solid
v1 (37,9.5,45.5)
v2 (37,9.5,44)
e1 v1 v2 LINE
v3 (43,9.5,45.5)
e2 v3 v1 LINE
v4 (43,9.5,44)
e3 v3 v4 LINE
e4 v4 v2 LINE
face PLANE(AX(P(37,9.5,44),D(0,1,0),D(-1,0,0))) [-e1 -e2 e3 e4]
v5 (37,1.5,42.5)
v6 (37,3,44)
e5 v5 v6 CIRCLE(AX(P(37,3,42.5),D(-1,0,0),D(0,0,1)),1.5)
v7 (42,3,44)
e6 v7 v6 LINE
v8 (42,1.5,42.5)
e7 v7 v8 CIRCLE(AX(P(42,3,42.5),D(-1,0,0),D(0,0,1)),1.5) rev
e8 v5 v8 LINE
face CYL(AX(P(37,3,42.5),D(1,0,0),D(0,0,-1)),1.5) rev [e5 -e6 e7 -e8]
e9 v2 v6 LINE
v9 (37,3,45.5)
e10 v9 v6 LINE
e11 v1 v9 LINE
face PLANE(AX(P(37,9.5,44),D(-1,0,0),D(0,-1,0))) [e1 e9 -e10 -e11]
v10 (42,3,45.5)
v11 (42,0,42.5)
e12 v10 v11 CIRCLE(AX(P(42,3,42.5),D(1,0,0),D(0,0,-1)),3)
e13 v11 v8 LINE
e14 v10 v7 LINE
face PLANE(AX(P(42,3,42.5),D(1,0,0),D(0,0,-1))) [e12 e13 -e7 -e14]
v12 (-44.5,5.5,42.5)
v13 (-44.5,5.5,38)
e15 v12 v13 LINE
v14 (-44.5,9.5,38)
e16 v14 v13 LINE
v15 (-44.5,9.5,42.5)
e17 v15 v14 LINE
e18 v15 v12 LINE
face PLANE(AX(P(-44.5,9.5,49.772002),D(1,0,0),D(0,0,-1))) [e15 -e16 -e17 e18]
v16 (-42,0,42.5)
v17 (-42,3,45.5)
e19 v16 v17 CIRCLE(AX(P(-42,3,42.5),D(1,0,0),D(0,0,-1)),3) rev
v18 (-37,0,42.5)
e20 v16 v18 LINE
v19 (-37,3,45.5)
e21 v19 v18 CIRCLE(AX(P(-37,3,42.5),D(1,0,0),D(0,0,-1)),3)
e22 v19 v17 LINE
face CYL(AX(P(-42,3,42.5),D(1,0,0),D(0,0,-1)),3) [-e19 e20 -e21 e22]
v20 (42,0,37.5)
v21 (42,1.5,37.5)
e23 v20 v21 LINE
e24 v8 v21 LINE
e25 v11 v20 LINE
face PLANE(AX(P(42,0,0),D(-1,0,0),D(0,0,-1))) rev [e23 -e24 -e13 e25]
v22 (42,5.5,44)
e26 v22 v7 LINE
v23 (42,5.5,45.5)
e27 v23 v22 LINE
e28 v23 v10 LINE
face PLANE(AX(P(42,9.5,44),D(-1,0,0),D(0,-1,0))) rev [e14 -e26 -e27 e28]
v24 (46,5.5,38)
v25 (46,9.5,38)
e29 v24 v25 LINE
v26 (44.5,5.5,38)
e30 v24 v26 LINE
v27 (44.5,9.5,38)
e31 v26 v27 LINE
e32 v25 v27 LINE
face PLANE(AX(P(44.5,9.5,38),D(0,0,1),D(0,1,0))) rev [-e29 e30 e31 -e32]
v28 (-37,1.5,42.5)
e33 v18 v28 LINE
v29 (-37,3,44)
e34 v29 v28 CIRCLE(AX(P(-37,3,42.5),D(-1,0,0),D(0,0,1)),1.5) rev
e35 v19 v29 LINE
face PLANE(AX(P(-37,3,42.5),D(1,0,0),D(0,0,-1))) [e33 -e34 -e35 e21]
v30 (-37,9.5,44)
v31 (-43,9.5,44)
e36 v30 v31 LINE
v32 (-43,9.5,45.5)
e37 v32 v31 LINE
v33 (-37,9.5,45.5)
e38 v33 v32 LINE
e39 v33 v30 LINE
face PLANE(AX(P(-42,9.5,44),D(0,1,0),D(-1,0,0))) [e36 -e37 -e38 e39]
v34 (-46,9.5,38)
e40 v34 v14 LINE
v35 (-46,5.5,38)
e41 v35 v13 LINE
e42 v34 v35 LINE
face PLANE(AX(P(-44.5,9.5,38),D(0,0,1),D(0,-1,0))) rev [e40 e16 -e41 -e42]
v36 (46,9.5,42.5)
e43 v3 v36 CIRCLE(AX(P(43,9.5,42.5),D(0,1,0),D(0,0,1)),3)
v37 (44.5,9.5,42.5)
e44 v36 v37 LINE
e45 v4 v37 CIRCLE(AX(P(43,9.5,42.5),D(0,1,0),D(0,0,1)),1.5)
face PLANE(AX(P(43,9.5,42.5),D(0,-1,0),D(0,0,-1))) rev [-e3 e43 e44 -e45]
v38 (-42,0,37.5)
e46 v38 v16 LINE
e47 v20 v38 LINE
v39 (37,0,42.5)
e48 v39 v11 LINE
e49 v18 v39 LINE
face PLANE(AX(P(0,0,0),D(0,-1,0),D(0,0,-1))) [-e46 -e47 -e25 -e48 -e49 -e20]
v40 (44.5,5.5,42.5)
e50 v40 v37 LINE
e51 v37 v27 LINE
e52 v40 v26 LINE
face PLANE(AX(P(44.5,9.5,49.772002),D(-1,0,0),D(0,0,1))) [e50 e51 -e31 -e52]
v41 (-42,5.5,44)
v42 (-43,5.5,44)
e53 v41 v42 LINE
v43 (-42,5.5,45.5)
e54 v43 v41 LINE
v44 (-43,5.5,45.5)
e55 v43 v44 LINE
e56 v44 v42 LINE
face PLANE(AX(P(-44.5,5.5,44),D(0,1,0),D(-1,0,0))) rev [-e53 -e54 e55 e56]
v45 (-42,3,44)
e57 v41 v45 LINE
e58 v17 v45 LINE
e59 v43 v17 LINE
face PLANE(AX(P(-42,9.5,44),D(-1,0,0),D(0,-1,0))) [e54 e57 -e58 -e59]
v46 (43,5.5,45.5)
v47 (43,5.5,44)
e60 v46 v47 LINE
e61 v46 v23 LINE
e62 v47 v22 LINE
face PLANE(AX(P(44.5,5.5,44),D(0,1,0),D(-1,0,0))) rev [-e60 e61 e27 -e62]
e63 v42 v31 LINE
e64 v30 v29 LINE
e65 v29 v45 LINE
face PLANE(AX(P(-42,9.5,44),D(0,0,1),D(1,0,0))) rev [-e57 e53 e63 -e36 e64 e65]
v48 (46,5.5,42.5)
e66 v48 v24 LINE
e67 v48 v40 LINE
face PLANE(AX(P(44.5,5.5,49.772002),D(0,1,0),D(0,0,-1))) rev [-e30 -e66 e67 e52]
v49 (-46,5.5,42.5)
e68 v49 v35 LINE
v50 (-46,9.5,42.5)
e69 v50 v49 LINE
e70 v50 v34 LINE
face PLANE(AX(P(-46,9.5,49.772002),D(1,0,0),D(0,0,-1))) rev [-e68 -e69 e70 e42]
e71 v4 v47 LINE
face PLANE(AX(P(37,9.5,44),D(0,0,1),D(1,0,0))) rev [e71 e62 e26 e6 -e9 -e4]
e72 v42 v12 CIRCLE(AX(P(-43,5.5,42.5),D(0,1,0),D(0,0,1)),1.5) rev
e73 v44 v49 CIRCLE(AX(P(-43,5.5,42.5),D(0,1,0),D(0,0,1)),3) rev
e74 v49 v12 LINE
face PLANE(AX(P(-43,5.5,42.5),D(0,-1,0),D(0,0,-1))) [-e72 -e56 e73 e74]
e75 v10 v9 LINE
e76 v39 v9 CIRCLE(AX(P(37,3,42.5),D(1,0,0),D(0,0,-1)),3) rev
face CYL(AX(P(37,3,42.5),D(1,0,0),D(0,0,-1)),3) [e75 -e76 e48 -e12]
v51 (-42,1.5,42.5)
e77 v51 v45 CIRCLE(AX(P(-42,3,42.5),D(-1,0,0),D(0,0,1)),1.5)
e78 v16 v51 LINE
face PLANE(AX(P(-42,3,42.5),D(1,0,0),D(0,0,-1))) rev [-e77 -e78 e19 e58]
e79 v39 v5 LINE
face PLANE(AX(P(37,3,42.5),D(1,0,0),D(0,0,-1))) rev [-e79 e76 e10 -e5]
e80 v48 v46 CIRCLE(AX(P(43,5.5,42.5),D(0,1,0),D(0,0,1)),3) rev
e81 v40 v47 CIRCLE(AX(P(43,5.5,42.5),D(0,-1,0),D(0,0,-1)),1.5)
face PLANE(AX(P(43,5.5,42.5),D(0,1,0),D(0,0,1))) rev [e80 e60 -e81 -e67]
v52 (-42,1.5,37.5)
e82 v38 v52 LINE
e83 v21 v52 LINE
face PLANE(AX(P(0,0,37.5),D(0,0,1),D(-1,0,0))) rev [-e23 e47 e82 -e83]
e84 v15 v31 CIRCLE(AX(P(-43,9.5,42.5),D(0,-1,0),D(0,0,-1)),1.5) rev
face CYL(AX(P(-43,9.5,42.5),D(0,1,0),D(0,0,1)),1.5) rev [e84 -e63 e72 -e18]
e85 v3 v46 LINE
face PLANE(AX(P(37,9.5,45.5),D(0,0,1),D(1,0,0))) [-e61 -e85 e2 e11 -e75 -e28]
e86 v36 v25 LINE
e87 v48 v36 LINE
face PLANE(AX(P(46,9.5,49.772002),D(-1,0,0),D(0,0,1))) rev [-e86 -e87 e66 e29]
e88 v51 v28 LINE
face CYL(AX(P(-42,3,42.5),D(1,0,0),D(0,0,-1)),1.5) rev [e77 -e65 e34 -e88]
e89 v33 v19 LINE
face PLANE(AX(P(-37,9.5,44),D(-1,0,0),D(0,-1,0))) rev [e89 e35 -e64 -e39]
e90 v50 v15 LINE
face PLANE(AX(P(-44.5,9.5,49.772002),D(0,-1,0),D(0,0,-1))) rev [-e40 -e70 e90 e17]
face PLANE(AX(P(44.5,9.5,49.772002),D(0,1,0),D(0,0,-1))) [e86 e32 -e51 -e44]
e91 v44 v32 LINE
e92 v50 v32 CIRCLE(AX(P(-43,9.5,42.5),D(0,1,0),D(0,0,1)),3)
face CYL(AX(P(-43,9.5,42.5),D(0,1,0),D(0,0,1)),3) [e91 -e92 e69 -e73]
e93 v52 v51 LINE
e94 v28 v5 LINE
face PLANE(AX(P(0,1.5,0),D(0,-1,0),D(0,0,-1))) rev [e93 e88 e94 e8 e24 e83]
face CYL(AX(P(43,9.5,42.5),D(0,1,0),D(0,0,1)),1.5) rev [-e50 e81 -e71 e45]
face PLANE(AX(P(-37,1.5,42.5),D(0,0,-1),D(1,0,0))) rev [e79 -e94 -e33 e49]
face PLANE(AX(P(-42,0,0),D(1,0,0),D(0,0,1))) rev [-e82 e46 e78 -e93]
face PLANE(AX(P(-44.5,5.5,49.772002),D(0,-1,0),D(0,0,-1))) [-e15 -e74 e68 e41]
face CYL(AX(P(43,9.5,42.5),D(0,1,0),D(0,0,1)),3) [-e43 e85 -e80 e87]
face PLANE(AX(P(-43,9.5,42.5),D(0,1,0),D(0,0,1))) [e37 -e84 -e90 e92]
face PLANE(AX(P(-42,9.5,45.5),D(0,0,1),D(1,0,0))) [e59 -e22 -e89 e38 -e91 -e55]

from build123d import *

# Parameters (mm, degrees)
BOSS_EXTRUDE1_DEPTH        = 1.5
SKETCH3_W                  = 5
SKETCH3_H                  = 1.5
BOSS_EXTRUDE2_DEPTH        = 8
BOSS_EXTRUDE3_DEPTH        = 6
BOSS_EXTRUDE3_DEPTH_BACK   = 1.5
SKETCH4_W                  = 1.5
SKETCH4_H                  = 4
BOSS_EXTRUDE3_2_DEPTH      = 6
BOSS_EXTRUDE3_2_DEPTH_BACK = 1.5
SKETCH5_W                  = 2.5
SKETCH5_H                  = 1.5
BOSS_EXTRUDE4_DEPTH        = 4
CONVERT_SOLID2_START       = 5.5
CONVERT_SOLID2_DEPTH       = 4
CONVERT_SOLID2_START_2     = -42
CONVERT_SOLID2_2_DEPTH     = 5
CONVERT_SOLID2_START_3     = 37
CONVERT_SOLID2_3_DEPTH     = 5
CONVERT_SOLID2_4_DEPTH     = 4
CONVERT_SOLID2_5_DEPTH     = 84
CUT_EXTRUDE1_DEPTH         = 10


# Read off the part's stored shape, not the designer's step: Convert-Solid2
with BuildPart() as part:
    # Sketch1 → Boss-Extrude1 (new body)
    with BuildSketch(Plane(origin=(0, 0, 0), x_dir=(1, 0, 0), z_dir=(0, 1, 0))):
        Polygon((-42, -45.5), (-42, -42.5), (-45, -42.5), (-45, 42.5), (45, 42.5), (45, -42.5), (42, -42.5), (42, -45.5), (37, -45.5), (37, -42.5), (-37, -42.5), (-37, -45.5), align=None)
    extrude(amount=BOSS_EXTRUDE1_DEPTH)

    # Sketch3 → Boss-Extrude2 (add)
    with BuildSketch(Plane(origin=(0, 1.5, 0), x_dir=(1, 0, 0), z_dir=(0, 1, 0))):
        with Locations((-39.5, -44.75)):
            Rectangle(SKETCH3_W, SKETCH3_H)
        with Locations((39.5, -44.75)):
            Rectangle(SKETCH3_W, SKETCH3_H)
    extrude(amount=BOSS_EXTRUDE2_DEPTH)



with BuildPart() as body_2:
    # Sketch4 → Boss-Extrude3 (new, two sides: drawn at the far end of the back side and taken through both)
    with BuildSketch(Plane(origin=(0, 0, 44), x_dir=(-1, 0, 0), z_dir=(0, 0, -1)).offset(-BOSS_EXTRUDE3_DEPTH_BACK)):
        with Locations((45.25, 7.5)):
            Rectangle(SKETCH4_W, SKETCH4_H)
    extrude(amount=BOSS_EXTRUDE3_DEPTH + BOSS_EXTRUDE3_DEPTH_BACK)


with BuildPart() as body_3:
    # Sketch4 → Boss-Extrude3 2 (new, two sides: drawn at the far end of the back side and taken through both)
    with BuildSketch(Plane(origin=(0, 0, 44), x_dir=(-1, 0, 0), z_dir=(0, 0, -1)).offset(-BOSS_EXTRUDE3_2_DEPTH_BACK)):
        with Locations((-45.25, 7.5)):
            Rectangle(SKETCH4_W, SKETCH4_H)
    extrude(amount=BOSS_EXTRUDE3_2_DEPTH + BOSS_EXTRUDE3_2_DEPTH_BACK)


with BuildPart() as part_1:
    add(part.part)

    add(body_2.part)  # Boss-Extrude4 merges body 2

    add(body_3.part)  # Boss-Extrude4 merges body 3
    # Sketch5 → Boss-Extrude4 (add)
    with BuildSketch(Plane(origin=(0, 9.5, 0), x_dir=(1, 0, 0), z_dir=(0, 1, 0))):
        with Locations((-43.25, -44.75)):
            Rectangle(SKETCH5_W, SKETCH5_H)
        with Locations((43.25, -44.75)):
            Rectangle(SKETCH5_W, SKETCH5_H)
    extrude(amount=-BOSS_EXTRUDE4_DEPTH)

    # Convert-Solid2 outline → Convert-Solid2 (add)
    with BuildSketch(Plane(origin=(0, 0, 0), x_dir=(1, 0, 0), z_dir=(0, 1, 0)).offset(CONVERT_SOLID2_START)):
        with BuildLine():
            ThreePointArc((44.5, -42.5), (44.060660172, -43.560660172), (43, -44))
            Line((43, -44), (44.5, -44))
            Line((44.5, -44), (44.5, -42.5))
        make_face()
        with BuildLine():
            ThreePointArc((-43, -44), (-44.060660172, -43.560660172), (-44.5, -42.5))
            Line((-44.5, -42.5), (-44.5, -44))
            Line((-44.5, -44), (-43, -44))
        make_face()
    extrude(amount=CONVERT_SOLID2_DEPTH)

    # Convert-Solid2 2 outline → Convert-Solid2 2 (add)
    with BuildSketch(Plane.YZ.offset(CONVERT_SOLID2_START_2)):
        with BuildLine():
            ThreePointArc((1.5, 42.5), (1.939339828, 43.560660172), (3, 44))
            Line((3, 44), (1.5, 44))
            Line((1.5, 44), (1.5, 42.5))
        make_face()
    extrude(amount=CONVERT_SOLID2_2_DEPTH)

    # Convert-Solid2 3 outline → Convert-Solid2 3 (add)
    with BuildSketch(Plane.YZ.offset(CONVERT_SOLID2_START_3)):
        with BuildLine():
            ThreePointArc((1.5, 42.5), (1.939339828, 43.560660172), (3, 44))
            Line((3, 44), (1.5, 44))
            Line((1.5, 44), (1.5, 42.5))
        make_face()
    extrude(amount=CONVERT_SOLID2_3_DEPTH)

    # Convert-Solid2 4 outline → Convert-Solid2 4 (cut)
    with BuildSketch(Plane(origin=(0, 0, 0), x_dir=(1, 0, 0), z_dir=(0, 1, 0)).offset(CONVERT_SOLID2_START)):
        with BuildLine():
            ThreePointArc((46, -42.5), (45.121320344, -44.621320344), (43, -45.5))
            Line((43, -45.5), (46, -45.5))
            Line((46, -45.5), (46, -42.5))
        make_face()
        with BuildLine():
            ThreePointArc((-43, -45.5), (-45.121320344, -44.621320344), (-46, -42.5))
            Line((-46, -42.5), (-46, -45.5))
            Line((-46, -45.5), (-43, -45.5))
        make_face()
    extrude(amount=CONVERT_SOLID2_4_DEPTH, mode=Mode.SUBTRACT)

    # Convert-Solid2 5 outline → Convert-Solid2 5 (cut)
    with BuildSketch(Plane.YZ.offset(CONVERT_SOLID2_START_2)):
        with BuildLine():
            ThreePointArc((0, 42.5), (0.878679656, 44.621320344), (3, 45.5))
            Line((3, 45.5), (0, 45.5))
            Line((0, 45.5), (0, 42.5))
        make_face()
    extrude(amount=CONVERT_SOLID2_5_DEPTH, mode=Mode.SUBTRACT)

    # Sketch6 → Cut-Extrude1 (cut)
    with BuildSketch(Plane(origin=(0, 1.5, 0), x_dir=(1, 0, 0), z_dir=(0, 1, 0))):
        Polygon((-45, 42.5), (45, 42.5), (45, -37.5), (45, -42.5), (42, -42.5), (42, -37.5), (-42, -37.5), (-42, -42.5), (-45, -42.5), (-45, -37.5), align=None)
    extrude(amount=-CUT_EXTRUDE1_DEPTH, mode=Mode.SUBTRACT)


solid = part_1.part
